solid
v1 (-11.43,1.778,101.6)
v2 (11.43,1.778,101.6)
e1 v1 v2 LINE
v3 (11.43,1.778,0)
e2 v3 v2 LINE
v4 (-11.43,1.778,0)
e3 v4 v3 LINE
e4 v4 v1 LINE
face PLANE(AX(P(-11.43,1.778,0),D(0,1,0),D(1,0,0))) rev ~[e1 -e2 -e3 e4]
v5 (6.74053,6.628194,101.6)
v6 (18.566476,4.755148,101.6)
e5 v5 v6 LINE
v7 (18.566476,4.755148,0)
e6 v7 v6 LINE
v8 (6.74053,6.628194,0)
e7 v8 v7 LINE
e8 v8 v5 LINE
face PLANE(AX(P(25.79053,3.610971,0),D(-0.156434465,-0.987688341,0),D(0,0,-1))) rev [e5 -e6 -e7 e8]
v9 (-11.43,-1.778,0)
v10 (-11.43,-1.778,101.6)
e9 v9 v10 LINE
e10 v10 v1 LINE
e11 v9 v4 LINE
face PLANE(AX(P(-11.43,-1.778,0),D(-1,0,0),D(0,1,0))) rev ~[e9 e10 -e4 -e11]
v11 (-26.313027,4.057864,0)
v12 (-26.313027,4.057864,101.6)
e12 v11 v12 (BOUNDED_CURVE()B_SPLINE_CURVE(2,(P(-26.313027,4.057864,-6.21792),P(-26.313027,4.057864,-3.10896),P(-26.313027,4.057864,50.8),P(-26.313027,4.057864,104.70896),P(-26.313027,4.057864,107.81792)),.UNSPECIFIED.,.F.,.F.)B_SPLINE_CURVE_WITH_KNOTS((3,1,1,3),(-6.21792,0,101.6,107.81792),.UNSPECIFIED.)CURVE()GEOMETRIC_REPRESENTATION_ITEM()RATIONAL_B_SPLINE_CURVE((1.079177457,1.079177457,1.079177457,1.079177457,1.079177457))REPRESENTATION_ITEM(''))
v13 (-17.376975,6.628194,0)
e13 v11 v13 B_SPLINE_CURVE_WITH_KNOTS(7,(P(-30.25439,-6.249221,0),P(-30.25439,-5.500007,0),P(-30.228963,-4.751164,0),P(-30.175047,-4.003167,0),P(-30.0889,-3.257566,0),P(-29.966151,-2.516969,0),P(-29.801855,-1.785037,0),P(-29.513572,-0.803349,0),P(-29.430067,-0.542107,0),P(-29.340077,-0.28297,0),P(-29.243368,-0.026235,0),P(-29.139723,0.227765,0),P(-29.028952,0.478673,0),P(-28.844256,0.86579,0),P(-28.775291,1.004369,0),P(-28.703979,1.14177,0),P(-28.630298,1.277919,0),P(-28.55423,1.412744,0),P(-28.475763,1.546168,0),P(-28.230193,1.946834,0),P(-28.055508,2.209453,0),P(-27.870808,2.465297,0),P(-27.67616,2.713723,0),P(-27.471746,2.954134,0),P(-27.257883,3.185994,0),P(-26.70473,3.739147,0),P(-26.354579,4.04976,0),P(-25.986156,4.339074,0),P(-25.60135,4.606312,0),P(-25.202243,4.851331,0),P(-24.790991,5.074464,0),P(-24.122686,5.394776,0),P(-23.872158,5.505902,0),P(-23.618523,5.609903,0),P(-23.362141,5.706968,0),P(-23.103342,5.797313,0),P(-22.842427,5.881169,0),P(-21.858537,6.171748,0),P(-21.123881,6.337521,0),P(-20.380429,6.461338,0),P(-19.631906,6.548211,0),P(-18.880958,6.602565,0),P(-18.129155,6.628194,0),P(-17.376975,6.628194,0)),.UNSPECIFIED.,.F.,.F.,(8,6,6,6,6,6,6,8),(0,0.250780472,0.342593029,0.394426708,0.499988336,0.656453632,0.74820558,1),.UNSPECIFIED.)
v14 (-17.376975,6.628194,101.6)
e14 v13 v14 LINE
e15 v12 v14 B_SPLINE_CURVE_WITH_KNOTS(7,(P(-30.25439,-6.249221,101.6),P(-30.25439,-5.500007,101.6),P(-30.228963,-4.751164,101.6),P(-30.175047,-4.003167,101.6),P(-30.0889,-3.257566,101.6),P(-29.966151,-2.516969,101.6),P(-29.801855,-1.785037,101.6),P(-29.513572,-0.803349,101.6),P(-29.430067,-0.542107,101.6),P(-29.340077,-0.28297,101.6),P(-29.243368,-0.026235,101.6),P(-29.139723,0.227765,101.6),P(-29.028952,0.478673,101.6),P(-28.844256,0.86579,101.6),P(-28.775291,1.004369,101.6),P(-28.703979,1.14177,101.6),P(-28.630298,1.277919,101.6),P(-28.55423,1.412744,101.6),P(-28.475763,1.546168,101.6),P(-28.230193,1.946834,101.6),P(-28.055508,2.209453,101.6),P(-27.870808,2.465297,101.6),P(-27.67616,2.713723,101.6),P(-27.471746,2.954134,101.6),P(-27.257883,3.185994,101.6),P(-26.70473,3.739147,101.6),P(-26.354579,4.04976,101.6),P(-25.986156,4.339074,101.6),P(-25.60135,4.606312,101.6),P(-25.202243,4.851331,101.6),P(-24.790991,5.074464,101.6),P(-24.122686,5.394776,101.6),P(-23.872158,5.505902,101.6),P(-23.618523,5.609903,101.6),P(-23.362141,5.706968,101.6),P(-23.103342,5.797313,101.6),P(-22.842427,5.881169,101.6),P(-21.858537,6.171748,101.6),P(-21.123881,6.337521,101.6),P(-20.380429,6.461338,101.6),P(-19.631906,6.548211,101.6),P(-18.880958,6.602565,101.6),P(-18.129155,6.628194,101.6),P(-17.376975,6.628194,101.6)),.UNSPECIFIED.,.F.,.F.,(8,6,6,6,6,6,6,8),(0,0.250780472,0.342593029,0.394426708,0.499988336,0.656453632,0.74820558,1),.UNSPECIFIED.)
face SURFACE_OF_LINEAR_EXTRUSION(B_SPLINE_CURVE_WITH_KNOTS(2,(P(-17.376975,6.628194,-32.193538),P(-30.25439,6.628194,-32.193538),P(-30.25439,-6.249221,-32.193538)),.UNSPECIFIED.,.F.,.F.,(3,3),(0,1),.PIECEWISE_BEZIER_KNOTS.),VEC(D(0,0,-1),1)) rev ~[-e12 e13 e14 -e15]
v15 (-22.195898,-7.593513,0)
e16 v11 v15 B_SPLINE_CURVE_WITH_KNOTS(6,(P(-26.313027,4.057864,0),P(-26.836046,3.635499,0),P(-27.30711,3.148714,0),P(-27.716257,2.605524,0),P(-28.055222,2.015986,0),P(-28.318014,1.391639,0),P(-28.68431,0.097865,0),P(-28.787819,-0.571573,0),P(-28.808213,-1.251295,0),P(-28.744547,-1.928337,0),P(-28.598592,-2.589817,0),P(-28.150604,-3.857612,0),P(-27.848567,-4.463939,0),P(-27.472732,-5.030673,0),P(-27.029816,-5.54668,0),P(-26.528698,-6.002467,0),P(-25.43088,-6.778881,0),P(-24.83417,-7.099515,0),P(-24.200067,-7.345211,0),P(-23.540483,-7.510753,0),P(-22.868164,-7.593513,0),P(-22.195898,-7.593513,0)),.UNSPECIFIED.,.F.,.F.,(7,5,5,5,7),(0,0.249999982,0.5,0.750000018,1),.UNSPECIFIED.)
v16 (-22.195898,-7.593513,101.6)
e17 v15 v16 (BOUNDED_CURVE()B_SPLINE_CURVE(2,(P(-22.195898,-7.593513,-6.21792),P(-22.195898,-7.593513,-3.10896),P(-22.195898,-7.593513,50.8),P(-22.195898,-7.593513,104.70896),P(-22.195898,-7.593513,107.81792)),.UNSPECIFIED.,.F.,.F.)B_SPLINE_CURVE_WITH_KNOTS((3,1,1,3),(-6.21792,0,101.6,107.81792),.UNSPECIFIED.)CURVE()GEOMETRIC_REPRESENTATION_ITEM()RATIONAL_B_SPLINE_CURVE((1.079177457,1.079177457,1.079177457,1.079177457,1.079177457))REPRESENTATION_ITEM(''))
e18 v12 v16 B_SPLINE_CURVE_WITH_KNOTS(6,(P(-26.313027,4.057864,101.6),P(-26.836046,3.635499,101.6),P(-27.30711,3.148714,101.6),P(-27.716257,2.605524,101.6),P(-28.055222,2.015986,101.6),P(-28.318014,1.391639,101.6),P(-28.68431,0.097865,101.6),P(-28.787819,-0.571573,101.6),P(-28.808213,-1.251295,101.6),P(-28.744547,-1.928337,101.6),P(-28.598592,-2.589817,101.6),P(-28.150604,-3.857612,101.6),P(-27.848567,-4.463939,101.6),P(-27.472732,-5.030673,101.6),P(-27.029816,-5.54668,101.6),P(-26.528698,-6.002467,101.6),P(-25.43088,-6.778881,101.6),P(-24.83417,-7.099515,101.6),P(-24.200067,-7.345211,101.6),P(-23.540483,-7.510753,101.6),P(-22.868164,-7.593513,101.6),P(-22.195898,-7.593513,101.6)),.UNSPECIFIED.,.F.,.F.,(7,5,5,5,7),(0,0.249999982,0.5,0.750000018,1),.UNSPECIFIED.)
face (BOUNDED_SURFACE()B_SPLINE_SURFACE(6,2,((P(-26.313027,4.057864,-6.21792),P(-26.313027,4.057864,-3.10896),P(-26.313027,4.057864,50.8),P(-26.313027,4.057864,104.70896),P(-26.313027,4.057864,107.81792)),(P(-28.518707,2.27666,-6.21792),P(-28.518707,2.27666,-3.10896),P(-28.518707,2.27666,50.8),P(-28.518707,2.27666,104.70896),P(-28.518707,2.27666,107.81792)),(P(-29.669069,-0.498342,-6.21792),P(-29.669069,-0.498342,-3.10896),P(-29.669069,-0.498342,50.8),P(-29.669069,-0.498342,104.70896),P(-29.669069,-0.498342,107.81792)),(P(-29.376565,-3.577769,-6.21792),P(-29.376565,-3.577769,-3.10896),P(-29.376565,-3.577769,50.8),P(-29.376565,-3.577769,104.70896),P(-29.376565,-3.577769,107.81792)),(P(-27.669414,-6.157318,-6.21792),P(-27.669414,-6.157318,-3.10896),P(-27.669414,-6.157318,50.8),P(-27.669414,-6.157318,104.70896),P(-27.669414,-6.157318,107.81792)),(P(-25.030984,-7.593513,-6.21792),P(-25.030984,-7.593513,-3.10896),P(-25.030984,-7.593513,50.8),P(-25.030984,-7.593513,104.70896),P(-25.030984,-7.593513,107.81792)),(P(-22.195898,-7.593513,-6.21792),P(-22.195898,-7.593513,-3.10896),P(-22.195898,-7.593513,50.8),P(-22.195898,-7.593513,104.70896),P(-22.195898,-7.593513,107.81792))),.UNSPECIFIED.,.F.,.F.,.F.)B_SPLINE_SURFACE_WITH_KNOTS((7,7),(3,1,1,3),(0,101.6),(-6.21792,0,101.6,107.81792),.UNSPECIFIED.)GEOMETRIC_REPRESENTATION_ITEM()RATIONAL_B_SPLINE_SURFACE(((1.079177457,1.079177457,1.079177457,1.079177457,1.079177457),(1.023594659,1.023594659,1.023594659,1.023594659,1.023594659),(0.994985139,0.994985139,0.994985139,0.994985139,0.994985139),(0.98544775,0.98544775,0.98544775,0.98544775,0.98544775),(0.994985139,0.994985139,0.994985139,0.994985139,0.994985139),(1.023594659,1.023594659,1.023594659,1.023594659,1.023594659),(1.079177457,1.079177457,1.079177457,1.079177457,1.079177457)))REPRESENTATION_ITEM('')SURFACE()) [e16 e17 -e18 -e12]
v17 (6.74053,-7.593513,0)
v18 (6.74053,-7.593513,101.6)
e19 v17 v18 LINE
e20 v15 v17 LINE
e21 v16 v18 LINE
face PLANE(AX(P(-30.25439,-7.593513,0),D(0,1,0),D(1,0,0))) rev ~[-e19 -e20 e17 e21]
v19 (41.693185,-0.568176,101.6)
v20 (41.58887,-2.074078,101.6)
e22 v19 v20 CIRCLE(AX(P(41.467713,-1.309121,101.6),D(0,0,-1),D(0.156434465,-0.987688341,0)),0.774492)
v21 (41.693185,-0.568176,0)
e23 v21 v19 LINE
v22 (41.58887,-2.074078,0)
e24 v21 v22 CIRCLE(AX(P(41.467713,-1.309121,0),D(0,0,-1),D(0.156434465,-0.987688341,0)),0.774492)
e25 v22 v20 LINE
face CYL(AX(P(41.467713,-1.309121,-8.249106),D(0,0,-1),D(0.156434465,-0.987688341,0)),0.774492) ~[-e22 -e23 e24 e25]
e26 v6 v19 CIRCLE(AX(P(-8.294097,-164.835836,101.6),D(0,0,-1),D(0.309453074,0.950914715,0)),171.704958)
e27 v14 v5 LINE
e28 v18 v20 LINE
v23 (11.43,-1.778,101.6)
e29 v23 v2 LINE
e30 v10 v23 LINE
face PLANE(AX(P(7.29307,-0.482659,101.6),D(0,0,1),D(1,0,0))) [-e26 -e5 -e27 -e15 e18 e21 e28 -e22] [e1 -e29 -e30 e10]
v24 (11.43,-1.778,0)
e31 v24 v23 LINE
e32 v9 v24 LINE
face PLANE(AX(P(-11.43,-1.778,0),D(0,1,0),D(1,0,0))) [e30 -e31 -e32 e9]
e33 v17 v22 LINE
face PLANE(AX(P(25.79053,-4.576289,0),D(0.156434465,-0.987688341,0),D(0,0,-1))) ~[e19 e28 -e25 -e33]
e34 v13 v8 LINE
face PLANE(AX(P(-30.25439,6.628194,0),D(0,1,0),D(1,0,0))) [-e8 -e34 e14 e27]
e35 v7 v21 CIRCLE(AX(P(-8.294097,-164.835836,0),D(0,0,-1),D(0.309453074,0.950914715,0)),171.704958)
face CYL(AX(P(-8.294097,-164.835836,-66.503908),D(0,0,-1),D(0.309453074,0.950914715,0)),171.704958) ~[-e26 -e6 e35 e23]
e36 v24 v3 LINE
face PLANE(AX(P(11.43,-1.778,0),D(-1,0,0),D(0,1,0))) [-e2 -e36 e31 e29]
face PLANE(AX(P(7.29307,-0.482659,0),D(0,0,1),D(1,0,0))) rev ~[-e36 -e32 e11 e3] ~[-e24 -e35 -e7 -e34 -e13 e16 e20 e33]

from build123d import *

# Parameters (mm, degrees)
F0_W        = 75.0949196517
F0_H        = 14.2217068933
F0_W_2      = 22.86
F0_H_2      = 3.556
F1_DEPTH    = 101.6
F2_T1_DEPTH = 165.9870757085
F3_R        = 6.5531023684
F4_SIZE2    = 6.0344471764
F4_SIZE     = 38.1
F4_2_SIZE2  = 6.0344471764
F4_2_SIZE   = 38.1
F5_T1_DEPTH = 234.6078157438
F6_T1_DEPTH = 118.09821105


# Not quite as in the source:
# - a fillet or chamfer that OpenCascade refuses, or shapes differently, is made with other operations: its cross-section is extruded or revolved along the edge and cut away or added


with BuildPart() as f1:
    # F0 (on Top) → F1 (new body)
    with BuildSketch(Plane.XY):
        with Locations((7.2930697352, -0.4826590884)):
            Rectangle(F0_W, F0_H)
        Rectangle(F0_W_2, F0_H_2, mode=Mode.SUBTRACT)
    extrude(amount=F1_DEPTH)

    # F2: fillet of radius 12.8774151417 on 1 edges, made by hand

    # F2_s2 → F2_t1 (cut)
    with BuildSketch(Plane.XY.offset(-32.1935378542)):
        with BuildLine():
            add(Edge.make_bspline(
                [(-17.376974949, 6.6281943582), (-30.2543900907, 6.6281943582), (-30.2543900907, -6.2492207835)],
                knots=[0, 0, 0, 1, 1, 1], degree=2, weights=[1, 1, 1]))
            Line((-30.2543900907, -6.2492207835), (-30.2543900907, 6.6281943582))
            Line((-30.2543900907, 6.6281943582), (-17.376974949, 6.6281943582))
        make_face()
    extrude(amount=F2_T1_DEPTH, mode=Mode.SUBTRACT)

    # F3
    f3_edges = [f1.edges().sort_by_distance(p)[0] for p in [
        (-30.25439, -7.593513, 50.8),
    ]]
    fillet(f3_edges, radius=F3_R)

    # F4
    f4_edges = [f1.edges().sort_by_distance(p)[0] for p in [
        (44.84053, 6.628194, 50.8),
    ]]
    f4_side = f1.faces().sort_by_distance((13.731777, 6.628194, 50.8))[0]
    chamfer(f4_edges, length=F4_SIZE, length2=F4_SIZE2, reference=f4_side)

    # F4#2
    f4_2_edges = [f1.edges().sort_by_distance(p)[0] for p in [
        (44.84053, -7.593513, 50.8),
    ]]
    f4_2_side = f1.faces().sort_by_distance((11.322316, -7.593513, 50.8))[0]
    chamfer(f4_2_edges, length=F4_2_SIZE, length2=F4_2_SIZE2, reference=f4_2_side)

    # F5: fillet of radius 171.7049577379 on 1 edges, made by hand

    # F5_s2 → F5_t1 (cut)
    with BuildSketch(Plane.XY.offset(-66.5039078719)):
        with BuildLine():
            ThreePointArc((44.840529561, -1.5590653587), (31.8279082353, 2.1157050987), (18.5664757974, 4.7551484822))
            Line((18.5664757974, 4.7551484822), (44.840529561, 0.5937471818))
            Line((44.840529561, 0.5937471818), (44.840529561, -1.5590653587))
        make_face()
    extrude(amount=F5_T1_DEPTH, mode=Mode.SUBTRACT)

    # F6: fillet of radius 0.7744916247 on 1 edges, made by hand

    # F6_s2 → F6_t1 (cut)
    with BuildSketch(Plane.XY.offset(-8.249105525)):
        with BuildLine():
            ThreePointArc((41.5888697855, -2.0740776724), (42.240352702, -1.3626428472), (41.6931850181, -0.5681763427))
            ThreePointArc((41.6931850181, -0.5681763427), (43.2692375752, -1.0560603886), (44.840529561, -1.5590653587))
            Line((44.840529561, -1.5590653587), (41.5888697855, -2.0740776724))
        make_face()
    extrude(amount=F6_T1_DEPTH, mode=Mode.SUBTRACT)


solid = f1.part
